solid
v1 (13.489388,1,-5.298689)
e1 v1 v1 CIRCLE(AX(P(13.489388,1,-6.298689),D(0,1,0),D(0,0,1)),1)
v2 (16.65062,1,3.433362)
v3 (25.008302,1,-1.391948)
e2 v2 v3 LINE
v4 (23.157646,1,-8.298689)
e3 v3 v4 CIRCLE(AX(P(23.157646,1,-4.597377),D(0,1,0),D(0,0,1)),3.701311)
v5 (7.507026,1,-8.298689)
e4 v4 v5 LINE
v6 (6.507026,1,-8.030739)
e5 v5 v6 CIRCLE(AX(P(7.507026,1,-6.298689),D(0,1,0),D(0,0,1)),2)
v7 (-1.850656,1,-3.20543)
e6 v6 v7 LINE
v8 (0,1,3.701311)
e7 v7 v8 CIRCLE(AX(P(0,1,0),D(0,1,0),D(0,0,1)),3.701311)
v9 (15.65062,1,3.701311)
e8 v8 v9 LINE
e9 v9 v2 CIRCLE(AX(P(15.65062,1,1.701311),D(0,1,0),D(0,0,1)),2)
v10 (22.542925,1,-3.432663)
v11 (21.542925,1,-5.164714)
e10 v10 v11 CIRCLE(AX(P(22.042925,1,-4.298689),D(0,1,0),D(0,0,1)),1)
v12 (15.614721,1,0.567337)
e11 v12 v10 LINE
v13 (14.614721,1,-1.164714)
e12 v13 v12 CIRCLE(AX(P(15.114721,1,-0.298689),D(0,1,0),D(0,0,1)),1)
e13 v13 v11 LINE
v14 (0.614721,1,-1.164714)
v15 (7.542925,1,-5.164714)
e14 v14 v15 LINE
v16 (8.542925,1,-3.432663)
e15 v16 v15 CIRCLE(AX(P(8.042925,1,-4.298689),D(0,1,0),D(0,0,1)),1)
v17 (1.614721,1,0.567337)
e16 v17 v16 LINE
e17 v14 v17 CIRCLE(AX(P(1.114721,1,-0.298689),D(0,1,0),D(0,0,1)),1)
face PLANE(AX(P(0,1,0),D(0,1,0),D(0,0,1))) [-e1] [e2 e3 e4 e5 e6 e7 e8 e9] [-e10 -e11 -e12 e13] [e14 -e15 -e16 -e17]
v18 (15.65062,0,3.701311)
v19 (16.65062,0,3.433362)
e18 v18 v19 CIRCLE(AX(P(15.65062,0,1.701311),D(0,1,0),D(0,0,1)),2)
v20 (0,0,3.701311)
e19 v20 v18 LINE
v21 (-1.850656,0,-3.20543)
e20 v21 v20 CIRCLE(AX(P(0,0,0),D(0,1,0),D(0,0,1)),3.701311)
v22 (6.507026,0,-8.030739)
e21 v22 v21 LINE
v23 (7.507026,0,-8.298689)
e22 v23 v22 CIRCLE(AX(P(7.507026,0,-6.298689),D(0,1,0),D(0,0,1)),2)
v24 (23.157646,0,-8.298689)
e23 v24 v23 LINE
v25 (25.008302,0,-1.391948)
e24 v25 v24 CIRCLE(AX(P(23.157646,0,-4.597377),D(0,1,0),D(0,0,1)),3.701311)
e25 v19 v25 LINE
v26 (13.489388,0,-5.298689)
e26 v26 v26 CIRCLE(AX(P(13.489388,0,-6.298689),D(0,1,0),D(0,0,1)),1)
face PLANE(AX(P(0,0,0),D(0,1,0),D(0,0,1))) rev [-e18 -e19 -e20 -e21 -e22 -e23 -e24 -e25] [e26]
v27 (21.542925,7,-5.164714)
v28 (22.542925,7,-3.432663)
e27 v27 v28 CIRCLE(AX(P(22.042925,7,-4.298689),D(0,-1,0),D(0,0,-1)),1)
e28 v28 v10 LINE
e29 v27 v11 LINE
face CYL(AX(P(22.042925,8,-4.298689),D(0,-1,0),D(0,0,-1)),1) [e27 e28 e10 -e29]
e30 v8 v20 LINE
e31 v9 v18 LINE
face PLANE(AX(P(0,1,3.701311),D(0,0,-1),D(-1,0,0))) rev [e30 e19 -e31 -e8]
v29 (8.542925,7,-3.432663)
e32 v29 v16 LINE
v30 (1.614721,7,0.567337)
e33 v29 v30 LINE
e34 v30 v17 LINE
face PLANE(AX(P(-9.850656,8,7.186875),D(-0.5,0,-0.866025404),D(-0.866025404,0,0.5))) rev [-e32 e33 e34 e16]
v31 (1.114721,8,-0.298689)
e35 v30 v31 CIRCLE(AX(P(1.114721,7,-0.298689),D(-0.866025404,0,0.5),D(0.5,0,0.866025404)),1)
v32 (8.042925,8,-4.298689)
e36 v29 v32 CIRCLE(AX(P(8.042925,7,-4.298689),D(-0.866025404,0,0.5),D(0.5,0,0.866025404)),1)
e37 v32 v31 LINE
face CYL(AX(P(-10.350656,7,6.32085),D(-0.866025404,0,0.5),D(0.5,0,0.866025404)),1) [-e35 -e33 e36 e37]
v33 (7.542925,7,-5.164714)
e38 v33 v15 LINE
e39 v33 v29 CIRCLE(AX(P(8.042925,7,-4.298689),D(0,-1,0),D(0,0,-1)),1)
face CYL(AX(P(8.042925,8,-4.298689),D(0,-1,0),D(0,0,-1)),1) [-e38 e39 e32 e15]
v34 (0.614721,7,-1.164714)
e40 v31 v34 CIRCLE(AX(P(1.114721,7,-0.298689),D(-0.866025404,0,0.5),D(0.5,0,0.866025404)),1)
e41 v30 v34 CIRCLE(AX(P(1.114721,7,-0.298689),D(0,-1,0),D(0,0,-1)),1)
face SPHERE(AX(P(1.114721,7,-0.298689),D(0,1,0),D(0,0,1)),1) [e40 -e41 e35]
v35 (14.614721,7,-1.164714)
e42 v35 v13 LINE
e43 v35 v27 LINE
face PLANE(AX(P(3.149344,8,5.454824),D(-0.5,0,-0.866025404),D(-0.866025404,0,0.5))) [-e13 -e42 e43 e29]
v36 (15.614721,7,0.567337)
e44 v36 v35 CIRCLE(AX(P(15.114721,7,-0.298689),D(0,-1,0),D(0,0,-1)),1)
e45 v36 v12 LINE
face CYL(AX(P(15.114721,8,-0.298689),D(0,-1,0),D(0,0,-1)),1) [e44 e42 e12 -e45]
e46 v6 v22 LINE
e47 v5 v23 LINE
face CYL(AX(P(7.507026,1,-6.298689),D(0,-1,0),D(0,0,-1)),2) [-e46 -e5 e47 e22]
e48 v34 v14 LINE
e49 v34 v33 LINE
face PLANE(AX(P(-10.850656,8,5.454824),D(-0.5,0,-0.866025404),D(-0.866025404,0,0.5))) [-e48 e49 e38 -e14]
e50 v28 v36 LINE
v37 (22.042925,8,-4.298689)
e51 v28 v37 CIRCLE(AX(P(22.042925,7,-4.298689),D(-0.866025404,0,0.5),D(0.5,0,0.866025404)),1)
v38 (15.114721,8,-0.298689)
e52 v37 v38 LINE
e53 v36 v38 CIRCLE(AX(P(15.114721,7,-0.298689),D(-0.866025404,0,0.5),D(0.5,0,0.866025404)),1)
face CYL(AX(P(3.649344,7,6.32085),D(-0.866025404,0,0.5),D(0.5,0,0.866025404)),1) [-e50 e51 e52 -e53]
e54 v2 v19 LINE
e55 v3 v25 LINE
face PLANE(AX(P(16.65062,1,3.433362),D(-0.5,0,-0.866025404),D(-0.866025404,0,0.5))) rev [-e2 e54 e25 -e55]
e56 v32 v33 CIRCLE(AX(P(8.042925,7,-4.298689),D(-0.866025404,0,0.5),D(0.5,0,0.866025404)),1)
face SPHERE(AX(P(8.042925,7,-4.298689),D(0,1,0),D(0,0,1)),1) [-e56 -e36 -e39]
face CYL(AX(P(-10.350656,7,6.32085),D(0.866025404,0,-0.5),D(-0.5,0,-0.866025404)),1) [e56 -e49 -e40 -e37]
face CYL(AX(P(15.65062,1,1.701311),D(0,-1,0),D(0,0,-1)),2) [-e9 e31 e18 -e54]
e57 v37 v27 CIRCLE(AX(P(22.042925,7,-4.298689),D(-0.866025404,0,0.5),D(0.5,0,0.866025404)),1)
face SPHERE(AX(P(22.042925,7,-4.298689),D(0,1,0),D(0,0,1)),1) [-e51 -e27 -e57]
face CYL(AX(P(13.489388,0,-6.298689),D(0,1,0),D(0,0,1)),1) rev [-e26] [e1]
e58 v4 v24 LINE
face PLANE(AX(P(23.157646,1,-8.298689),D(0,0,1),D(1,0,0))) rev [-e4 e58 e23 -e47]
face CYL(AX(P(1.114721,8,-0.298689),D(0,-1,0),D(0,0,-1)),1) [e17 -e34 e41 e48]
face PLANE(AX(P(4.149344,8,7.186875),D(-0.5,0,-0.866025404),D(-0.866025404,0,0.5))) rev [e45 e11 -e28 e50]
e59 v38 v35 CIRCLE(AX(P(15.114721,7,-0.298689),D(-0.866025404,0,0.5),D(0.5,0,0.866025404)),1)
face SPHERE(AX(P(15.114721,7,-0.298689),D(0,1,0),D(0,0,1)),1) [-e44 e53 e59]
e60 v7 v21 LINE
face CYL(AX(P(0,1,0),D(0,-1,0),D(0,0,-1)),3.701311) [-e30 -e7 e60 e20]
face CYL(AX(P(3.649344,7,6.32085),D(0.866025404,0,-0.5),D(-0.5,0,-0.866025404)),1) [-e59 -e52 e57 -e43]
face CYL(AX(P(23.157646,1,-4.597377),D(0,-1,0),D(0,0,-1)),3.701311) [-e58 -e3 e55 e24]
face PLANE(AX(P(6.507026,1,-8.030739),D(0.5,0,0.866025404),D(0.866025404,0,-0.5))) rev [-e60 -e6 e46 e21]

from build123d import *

# Parameters (mm, degrees)
BOSS_EXTRUDE1_DEPTH = 1
BOSS_EXTRUDE2_DEPTH = 7
LPATTERN1_COUNT     = 2
LPATTERN1_PITCH     = 14
FILLET3_R           = 1
SKETCH3_R           = 1
CUT_EXTRUDE1_DEPTH  = 29.970188425


with BuildPart() as part:
    # Sketch1 → Boss-Extrude1 (new body)
    with BuildSketch(Plane(origin=(0, 0, 0), x_dir=(1, 0, 0), z_dir=(0, 1, 0))):
        with BuildLine():
            Line((0, -3.701311317), (15.650619727, -3.701311317))
            ThreePointArc((15.650619727, -3.701311317), (16.168257817, -3.633162969), (16.650619727, -3.433362124))
            Line((16.650619727, -3.433362124), (25.008301572, 1.391947739))
            ThreePointArc((25.008301572, 1.391947739), (26.732838106, 5.555347227), (23.157645914, 8.298688683))
            Line((23.157645914, 8.298688683), (7.507026187, 8.298688683))
            ThreePointArc((7.507026187, 8.298688683), (6.989388097, 8.230540336), (6.507026187, 8.030739491))
            Line((6.507026187, 8.030739491), (-1.850655658, 3.205429628))
            ThreePointArc((-1.850655658, 3.205429628), (-3.575192192, -0.957969861), (0, -3.701311317))
        make_face()
    extrude(amount=BOSS_EXTRUDE1_DEPTH)

    # Sketch2 → Boss-Extrude2 (add)
    with BuildSketch(Plane(origin=(0, 1, 0), x_dir=(1, 0, 0), z_dir=(0, 1, 0))):
        with BuildLine():
            Line((21.542924572, 5.164714087), (14.614721342, 1.164714087))
            ThreePointArc((14.614721342, 1.164714087), (14.248695938, -0.201311317), (15.614721342, -0.567336721))
            Line((15.614721342, -0.567336721), (22.542924572, 3.432663279))
            ThreePointArc((22.542924572, 3.432663279), (22.908949976, 4.798688683), (21.542924572, 5.164714087))
        make_face()
    boss_extrude2 = extrude(amount=BOSS_EXTRUDE2_DEPTH)

    # LPattern1: Boss-Extrude2 ×2
    with Locations(*[(-i * LPATTERN1_PITCH, 0, 0) for i in range(1, LPATTERN1_COUNT)]):
        add(boss_extrude2)

    # Fillet3
    fillet3_edges = [part.edges().sort_by_distance(p)[0] for p in [
        (14.248695938, 8, 0.201311317),
        (18.078822957, 8, -3.164714087),
        (22.908949976, 8, -4.798688683),
        (19.078822957, 8, -1.432663279),
        (0.248695938, 8, 0.201311317),
        (4.078822957, 8, -3.164714087),
        (8.908949976, 8, -4.798688683),
        (5.078822957, 8, -1.432663279),
    ]]
    fillet(fillet3_edges, radius=FILLET3_R)

    # Sketch3 → Cut-Extrude1 (cut, through all)
    with BuildSketch(Plane(origin=(0, 1, 0), x_dir=(1, 0, 0), z_dir=(0, 1, 0))):
        with Locations((13.489388097, 6.298688683)):
            Circle(SKETCH3_R)
    extrude(amount=-CUT_EXTRUDE1_DEPTH, mode=Mode.SUBTRACT)


solid = part.part
